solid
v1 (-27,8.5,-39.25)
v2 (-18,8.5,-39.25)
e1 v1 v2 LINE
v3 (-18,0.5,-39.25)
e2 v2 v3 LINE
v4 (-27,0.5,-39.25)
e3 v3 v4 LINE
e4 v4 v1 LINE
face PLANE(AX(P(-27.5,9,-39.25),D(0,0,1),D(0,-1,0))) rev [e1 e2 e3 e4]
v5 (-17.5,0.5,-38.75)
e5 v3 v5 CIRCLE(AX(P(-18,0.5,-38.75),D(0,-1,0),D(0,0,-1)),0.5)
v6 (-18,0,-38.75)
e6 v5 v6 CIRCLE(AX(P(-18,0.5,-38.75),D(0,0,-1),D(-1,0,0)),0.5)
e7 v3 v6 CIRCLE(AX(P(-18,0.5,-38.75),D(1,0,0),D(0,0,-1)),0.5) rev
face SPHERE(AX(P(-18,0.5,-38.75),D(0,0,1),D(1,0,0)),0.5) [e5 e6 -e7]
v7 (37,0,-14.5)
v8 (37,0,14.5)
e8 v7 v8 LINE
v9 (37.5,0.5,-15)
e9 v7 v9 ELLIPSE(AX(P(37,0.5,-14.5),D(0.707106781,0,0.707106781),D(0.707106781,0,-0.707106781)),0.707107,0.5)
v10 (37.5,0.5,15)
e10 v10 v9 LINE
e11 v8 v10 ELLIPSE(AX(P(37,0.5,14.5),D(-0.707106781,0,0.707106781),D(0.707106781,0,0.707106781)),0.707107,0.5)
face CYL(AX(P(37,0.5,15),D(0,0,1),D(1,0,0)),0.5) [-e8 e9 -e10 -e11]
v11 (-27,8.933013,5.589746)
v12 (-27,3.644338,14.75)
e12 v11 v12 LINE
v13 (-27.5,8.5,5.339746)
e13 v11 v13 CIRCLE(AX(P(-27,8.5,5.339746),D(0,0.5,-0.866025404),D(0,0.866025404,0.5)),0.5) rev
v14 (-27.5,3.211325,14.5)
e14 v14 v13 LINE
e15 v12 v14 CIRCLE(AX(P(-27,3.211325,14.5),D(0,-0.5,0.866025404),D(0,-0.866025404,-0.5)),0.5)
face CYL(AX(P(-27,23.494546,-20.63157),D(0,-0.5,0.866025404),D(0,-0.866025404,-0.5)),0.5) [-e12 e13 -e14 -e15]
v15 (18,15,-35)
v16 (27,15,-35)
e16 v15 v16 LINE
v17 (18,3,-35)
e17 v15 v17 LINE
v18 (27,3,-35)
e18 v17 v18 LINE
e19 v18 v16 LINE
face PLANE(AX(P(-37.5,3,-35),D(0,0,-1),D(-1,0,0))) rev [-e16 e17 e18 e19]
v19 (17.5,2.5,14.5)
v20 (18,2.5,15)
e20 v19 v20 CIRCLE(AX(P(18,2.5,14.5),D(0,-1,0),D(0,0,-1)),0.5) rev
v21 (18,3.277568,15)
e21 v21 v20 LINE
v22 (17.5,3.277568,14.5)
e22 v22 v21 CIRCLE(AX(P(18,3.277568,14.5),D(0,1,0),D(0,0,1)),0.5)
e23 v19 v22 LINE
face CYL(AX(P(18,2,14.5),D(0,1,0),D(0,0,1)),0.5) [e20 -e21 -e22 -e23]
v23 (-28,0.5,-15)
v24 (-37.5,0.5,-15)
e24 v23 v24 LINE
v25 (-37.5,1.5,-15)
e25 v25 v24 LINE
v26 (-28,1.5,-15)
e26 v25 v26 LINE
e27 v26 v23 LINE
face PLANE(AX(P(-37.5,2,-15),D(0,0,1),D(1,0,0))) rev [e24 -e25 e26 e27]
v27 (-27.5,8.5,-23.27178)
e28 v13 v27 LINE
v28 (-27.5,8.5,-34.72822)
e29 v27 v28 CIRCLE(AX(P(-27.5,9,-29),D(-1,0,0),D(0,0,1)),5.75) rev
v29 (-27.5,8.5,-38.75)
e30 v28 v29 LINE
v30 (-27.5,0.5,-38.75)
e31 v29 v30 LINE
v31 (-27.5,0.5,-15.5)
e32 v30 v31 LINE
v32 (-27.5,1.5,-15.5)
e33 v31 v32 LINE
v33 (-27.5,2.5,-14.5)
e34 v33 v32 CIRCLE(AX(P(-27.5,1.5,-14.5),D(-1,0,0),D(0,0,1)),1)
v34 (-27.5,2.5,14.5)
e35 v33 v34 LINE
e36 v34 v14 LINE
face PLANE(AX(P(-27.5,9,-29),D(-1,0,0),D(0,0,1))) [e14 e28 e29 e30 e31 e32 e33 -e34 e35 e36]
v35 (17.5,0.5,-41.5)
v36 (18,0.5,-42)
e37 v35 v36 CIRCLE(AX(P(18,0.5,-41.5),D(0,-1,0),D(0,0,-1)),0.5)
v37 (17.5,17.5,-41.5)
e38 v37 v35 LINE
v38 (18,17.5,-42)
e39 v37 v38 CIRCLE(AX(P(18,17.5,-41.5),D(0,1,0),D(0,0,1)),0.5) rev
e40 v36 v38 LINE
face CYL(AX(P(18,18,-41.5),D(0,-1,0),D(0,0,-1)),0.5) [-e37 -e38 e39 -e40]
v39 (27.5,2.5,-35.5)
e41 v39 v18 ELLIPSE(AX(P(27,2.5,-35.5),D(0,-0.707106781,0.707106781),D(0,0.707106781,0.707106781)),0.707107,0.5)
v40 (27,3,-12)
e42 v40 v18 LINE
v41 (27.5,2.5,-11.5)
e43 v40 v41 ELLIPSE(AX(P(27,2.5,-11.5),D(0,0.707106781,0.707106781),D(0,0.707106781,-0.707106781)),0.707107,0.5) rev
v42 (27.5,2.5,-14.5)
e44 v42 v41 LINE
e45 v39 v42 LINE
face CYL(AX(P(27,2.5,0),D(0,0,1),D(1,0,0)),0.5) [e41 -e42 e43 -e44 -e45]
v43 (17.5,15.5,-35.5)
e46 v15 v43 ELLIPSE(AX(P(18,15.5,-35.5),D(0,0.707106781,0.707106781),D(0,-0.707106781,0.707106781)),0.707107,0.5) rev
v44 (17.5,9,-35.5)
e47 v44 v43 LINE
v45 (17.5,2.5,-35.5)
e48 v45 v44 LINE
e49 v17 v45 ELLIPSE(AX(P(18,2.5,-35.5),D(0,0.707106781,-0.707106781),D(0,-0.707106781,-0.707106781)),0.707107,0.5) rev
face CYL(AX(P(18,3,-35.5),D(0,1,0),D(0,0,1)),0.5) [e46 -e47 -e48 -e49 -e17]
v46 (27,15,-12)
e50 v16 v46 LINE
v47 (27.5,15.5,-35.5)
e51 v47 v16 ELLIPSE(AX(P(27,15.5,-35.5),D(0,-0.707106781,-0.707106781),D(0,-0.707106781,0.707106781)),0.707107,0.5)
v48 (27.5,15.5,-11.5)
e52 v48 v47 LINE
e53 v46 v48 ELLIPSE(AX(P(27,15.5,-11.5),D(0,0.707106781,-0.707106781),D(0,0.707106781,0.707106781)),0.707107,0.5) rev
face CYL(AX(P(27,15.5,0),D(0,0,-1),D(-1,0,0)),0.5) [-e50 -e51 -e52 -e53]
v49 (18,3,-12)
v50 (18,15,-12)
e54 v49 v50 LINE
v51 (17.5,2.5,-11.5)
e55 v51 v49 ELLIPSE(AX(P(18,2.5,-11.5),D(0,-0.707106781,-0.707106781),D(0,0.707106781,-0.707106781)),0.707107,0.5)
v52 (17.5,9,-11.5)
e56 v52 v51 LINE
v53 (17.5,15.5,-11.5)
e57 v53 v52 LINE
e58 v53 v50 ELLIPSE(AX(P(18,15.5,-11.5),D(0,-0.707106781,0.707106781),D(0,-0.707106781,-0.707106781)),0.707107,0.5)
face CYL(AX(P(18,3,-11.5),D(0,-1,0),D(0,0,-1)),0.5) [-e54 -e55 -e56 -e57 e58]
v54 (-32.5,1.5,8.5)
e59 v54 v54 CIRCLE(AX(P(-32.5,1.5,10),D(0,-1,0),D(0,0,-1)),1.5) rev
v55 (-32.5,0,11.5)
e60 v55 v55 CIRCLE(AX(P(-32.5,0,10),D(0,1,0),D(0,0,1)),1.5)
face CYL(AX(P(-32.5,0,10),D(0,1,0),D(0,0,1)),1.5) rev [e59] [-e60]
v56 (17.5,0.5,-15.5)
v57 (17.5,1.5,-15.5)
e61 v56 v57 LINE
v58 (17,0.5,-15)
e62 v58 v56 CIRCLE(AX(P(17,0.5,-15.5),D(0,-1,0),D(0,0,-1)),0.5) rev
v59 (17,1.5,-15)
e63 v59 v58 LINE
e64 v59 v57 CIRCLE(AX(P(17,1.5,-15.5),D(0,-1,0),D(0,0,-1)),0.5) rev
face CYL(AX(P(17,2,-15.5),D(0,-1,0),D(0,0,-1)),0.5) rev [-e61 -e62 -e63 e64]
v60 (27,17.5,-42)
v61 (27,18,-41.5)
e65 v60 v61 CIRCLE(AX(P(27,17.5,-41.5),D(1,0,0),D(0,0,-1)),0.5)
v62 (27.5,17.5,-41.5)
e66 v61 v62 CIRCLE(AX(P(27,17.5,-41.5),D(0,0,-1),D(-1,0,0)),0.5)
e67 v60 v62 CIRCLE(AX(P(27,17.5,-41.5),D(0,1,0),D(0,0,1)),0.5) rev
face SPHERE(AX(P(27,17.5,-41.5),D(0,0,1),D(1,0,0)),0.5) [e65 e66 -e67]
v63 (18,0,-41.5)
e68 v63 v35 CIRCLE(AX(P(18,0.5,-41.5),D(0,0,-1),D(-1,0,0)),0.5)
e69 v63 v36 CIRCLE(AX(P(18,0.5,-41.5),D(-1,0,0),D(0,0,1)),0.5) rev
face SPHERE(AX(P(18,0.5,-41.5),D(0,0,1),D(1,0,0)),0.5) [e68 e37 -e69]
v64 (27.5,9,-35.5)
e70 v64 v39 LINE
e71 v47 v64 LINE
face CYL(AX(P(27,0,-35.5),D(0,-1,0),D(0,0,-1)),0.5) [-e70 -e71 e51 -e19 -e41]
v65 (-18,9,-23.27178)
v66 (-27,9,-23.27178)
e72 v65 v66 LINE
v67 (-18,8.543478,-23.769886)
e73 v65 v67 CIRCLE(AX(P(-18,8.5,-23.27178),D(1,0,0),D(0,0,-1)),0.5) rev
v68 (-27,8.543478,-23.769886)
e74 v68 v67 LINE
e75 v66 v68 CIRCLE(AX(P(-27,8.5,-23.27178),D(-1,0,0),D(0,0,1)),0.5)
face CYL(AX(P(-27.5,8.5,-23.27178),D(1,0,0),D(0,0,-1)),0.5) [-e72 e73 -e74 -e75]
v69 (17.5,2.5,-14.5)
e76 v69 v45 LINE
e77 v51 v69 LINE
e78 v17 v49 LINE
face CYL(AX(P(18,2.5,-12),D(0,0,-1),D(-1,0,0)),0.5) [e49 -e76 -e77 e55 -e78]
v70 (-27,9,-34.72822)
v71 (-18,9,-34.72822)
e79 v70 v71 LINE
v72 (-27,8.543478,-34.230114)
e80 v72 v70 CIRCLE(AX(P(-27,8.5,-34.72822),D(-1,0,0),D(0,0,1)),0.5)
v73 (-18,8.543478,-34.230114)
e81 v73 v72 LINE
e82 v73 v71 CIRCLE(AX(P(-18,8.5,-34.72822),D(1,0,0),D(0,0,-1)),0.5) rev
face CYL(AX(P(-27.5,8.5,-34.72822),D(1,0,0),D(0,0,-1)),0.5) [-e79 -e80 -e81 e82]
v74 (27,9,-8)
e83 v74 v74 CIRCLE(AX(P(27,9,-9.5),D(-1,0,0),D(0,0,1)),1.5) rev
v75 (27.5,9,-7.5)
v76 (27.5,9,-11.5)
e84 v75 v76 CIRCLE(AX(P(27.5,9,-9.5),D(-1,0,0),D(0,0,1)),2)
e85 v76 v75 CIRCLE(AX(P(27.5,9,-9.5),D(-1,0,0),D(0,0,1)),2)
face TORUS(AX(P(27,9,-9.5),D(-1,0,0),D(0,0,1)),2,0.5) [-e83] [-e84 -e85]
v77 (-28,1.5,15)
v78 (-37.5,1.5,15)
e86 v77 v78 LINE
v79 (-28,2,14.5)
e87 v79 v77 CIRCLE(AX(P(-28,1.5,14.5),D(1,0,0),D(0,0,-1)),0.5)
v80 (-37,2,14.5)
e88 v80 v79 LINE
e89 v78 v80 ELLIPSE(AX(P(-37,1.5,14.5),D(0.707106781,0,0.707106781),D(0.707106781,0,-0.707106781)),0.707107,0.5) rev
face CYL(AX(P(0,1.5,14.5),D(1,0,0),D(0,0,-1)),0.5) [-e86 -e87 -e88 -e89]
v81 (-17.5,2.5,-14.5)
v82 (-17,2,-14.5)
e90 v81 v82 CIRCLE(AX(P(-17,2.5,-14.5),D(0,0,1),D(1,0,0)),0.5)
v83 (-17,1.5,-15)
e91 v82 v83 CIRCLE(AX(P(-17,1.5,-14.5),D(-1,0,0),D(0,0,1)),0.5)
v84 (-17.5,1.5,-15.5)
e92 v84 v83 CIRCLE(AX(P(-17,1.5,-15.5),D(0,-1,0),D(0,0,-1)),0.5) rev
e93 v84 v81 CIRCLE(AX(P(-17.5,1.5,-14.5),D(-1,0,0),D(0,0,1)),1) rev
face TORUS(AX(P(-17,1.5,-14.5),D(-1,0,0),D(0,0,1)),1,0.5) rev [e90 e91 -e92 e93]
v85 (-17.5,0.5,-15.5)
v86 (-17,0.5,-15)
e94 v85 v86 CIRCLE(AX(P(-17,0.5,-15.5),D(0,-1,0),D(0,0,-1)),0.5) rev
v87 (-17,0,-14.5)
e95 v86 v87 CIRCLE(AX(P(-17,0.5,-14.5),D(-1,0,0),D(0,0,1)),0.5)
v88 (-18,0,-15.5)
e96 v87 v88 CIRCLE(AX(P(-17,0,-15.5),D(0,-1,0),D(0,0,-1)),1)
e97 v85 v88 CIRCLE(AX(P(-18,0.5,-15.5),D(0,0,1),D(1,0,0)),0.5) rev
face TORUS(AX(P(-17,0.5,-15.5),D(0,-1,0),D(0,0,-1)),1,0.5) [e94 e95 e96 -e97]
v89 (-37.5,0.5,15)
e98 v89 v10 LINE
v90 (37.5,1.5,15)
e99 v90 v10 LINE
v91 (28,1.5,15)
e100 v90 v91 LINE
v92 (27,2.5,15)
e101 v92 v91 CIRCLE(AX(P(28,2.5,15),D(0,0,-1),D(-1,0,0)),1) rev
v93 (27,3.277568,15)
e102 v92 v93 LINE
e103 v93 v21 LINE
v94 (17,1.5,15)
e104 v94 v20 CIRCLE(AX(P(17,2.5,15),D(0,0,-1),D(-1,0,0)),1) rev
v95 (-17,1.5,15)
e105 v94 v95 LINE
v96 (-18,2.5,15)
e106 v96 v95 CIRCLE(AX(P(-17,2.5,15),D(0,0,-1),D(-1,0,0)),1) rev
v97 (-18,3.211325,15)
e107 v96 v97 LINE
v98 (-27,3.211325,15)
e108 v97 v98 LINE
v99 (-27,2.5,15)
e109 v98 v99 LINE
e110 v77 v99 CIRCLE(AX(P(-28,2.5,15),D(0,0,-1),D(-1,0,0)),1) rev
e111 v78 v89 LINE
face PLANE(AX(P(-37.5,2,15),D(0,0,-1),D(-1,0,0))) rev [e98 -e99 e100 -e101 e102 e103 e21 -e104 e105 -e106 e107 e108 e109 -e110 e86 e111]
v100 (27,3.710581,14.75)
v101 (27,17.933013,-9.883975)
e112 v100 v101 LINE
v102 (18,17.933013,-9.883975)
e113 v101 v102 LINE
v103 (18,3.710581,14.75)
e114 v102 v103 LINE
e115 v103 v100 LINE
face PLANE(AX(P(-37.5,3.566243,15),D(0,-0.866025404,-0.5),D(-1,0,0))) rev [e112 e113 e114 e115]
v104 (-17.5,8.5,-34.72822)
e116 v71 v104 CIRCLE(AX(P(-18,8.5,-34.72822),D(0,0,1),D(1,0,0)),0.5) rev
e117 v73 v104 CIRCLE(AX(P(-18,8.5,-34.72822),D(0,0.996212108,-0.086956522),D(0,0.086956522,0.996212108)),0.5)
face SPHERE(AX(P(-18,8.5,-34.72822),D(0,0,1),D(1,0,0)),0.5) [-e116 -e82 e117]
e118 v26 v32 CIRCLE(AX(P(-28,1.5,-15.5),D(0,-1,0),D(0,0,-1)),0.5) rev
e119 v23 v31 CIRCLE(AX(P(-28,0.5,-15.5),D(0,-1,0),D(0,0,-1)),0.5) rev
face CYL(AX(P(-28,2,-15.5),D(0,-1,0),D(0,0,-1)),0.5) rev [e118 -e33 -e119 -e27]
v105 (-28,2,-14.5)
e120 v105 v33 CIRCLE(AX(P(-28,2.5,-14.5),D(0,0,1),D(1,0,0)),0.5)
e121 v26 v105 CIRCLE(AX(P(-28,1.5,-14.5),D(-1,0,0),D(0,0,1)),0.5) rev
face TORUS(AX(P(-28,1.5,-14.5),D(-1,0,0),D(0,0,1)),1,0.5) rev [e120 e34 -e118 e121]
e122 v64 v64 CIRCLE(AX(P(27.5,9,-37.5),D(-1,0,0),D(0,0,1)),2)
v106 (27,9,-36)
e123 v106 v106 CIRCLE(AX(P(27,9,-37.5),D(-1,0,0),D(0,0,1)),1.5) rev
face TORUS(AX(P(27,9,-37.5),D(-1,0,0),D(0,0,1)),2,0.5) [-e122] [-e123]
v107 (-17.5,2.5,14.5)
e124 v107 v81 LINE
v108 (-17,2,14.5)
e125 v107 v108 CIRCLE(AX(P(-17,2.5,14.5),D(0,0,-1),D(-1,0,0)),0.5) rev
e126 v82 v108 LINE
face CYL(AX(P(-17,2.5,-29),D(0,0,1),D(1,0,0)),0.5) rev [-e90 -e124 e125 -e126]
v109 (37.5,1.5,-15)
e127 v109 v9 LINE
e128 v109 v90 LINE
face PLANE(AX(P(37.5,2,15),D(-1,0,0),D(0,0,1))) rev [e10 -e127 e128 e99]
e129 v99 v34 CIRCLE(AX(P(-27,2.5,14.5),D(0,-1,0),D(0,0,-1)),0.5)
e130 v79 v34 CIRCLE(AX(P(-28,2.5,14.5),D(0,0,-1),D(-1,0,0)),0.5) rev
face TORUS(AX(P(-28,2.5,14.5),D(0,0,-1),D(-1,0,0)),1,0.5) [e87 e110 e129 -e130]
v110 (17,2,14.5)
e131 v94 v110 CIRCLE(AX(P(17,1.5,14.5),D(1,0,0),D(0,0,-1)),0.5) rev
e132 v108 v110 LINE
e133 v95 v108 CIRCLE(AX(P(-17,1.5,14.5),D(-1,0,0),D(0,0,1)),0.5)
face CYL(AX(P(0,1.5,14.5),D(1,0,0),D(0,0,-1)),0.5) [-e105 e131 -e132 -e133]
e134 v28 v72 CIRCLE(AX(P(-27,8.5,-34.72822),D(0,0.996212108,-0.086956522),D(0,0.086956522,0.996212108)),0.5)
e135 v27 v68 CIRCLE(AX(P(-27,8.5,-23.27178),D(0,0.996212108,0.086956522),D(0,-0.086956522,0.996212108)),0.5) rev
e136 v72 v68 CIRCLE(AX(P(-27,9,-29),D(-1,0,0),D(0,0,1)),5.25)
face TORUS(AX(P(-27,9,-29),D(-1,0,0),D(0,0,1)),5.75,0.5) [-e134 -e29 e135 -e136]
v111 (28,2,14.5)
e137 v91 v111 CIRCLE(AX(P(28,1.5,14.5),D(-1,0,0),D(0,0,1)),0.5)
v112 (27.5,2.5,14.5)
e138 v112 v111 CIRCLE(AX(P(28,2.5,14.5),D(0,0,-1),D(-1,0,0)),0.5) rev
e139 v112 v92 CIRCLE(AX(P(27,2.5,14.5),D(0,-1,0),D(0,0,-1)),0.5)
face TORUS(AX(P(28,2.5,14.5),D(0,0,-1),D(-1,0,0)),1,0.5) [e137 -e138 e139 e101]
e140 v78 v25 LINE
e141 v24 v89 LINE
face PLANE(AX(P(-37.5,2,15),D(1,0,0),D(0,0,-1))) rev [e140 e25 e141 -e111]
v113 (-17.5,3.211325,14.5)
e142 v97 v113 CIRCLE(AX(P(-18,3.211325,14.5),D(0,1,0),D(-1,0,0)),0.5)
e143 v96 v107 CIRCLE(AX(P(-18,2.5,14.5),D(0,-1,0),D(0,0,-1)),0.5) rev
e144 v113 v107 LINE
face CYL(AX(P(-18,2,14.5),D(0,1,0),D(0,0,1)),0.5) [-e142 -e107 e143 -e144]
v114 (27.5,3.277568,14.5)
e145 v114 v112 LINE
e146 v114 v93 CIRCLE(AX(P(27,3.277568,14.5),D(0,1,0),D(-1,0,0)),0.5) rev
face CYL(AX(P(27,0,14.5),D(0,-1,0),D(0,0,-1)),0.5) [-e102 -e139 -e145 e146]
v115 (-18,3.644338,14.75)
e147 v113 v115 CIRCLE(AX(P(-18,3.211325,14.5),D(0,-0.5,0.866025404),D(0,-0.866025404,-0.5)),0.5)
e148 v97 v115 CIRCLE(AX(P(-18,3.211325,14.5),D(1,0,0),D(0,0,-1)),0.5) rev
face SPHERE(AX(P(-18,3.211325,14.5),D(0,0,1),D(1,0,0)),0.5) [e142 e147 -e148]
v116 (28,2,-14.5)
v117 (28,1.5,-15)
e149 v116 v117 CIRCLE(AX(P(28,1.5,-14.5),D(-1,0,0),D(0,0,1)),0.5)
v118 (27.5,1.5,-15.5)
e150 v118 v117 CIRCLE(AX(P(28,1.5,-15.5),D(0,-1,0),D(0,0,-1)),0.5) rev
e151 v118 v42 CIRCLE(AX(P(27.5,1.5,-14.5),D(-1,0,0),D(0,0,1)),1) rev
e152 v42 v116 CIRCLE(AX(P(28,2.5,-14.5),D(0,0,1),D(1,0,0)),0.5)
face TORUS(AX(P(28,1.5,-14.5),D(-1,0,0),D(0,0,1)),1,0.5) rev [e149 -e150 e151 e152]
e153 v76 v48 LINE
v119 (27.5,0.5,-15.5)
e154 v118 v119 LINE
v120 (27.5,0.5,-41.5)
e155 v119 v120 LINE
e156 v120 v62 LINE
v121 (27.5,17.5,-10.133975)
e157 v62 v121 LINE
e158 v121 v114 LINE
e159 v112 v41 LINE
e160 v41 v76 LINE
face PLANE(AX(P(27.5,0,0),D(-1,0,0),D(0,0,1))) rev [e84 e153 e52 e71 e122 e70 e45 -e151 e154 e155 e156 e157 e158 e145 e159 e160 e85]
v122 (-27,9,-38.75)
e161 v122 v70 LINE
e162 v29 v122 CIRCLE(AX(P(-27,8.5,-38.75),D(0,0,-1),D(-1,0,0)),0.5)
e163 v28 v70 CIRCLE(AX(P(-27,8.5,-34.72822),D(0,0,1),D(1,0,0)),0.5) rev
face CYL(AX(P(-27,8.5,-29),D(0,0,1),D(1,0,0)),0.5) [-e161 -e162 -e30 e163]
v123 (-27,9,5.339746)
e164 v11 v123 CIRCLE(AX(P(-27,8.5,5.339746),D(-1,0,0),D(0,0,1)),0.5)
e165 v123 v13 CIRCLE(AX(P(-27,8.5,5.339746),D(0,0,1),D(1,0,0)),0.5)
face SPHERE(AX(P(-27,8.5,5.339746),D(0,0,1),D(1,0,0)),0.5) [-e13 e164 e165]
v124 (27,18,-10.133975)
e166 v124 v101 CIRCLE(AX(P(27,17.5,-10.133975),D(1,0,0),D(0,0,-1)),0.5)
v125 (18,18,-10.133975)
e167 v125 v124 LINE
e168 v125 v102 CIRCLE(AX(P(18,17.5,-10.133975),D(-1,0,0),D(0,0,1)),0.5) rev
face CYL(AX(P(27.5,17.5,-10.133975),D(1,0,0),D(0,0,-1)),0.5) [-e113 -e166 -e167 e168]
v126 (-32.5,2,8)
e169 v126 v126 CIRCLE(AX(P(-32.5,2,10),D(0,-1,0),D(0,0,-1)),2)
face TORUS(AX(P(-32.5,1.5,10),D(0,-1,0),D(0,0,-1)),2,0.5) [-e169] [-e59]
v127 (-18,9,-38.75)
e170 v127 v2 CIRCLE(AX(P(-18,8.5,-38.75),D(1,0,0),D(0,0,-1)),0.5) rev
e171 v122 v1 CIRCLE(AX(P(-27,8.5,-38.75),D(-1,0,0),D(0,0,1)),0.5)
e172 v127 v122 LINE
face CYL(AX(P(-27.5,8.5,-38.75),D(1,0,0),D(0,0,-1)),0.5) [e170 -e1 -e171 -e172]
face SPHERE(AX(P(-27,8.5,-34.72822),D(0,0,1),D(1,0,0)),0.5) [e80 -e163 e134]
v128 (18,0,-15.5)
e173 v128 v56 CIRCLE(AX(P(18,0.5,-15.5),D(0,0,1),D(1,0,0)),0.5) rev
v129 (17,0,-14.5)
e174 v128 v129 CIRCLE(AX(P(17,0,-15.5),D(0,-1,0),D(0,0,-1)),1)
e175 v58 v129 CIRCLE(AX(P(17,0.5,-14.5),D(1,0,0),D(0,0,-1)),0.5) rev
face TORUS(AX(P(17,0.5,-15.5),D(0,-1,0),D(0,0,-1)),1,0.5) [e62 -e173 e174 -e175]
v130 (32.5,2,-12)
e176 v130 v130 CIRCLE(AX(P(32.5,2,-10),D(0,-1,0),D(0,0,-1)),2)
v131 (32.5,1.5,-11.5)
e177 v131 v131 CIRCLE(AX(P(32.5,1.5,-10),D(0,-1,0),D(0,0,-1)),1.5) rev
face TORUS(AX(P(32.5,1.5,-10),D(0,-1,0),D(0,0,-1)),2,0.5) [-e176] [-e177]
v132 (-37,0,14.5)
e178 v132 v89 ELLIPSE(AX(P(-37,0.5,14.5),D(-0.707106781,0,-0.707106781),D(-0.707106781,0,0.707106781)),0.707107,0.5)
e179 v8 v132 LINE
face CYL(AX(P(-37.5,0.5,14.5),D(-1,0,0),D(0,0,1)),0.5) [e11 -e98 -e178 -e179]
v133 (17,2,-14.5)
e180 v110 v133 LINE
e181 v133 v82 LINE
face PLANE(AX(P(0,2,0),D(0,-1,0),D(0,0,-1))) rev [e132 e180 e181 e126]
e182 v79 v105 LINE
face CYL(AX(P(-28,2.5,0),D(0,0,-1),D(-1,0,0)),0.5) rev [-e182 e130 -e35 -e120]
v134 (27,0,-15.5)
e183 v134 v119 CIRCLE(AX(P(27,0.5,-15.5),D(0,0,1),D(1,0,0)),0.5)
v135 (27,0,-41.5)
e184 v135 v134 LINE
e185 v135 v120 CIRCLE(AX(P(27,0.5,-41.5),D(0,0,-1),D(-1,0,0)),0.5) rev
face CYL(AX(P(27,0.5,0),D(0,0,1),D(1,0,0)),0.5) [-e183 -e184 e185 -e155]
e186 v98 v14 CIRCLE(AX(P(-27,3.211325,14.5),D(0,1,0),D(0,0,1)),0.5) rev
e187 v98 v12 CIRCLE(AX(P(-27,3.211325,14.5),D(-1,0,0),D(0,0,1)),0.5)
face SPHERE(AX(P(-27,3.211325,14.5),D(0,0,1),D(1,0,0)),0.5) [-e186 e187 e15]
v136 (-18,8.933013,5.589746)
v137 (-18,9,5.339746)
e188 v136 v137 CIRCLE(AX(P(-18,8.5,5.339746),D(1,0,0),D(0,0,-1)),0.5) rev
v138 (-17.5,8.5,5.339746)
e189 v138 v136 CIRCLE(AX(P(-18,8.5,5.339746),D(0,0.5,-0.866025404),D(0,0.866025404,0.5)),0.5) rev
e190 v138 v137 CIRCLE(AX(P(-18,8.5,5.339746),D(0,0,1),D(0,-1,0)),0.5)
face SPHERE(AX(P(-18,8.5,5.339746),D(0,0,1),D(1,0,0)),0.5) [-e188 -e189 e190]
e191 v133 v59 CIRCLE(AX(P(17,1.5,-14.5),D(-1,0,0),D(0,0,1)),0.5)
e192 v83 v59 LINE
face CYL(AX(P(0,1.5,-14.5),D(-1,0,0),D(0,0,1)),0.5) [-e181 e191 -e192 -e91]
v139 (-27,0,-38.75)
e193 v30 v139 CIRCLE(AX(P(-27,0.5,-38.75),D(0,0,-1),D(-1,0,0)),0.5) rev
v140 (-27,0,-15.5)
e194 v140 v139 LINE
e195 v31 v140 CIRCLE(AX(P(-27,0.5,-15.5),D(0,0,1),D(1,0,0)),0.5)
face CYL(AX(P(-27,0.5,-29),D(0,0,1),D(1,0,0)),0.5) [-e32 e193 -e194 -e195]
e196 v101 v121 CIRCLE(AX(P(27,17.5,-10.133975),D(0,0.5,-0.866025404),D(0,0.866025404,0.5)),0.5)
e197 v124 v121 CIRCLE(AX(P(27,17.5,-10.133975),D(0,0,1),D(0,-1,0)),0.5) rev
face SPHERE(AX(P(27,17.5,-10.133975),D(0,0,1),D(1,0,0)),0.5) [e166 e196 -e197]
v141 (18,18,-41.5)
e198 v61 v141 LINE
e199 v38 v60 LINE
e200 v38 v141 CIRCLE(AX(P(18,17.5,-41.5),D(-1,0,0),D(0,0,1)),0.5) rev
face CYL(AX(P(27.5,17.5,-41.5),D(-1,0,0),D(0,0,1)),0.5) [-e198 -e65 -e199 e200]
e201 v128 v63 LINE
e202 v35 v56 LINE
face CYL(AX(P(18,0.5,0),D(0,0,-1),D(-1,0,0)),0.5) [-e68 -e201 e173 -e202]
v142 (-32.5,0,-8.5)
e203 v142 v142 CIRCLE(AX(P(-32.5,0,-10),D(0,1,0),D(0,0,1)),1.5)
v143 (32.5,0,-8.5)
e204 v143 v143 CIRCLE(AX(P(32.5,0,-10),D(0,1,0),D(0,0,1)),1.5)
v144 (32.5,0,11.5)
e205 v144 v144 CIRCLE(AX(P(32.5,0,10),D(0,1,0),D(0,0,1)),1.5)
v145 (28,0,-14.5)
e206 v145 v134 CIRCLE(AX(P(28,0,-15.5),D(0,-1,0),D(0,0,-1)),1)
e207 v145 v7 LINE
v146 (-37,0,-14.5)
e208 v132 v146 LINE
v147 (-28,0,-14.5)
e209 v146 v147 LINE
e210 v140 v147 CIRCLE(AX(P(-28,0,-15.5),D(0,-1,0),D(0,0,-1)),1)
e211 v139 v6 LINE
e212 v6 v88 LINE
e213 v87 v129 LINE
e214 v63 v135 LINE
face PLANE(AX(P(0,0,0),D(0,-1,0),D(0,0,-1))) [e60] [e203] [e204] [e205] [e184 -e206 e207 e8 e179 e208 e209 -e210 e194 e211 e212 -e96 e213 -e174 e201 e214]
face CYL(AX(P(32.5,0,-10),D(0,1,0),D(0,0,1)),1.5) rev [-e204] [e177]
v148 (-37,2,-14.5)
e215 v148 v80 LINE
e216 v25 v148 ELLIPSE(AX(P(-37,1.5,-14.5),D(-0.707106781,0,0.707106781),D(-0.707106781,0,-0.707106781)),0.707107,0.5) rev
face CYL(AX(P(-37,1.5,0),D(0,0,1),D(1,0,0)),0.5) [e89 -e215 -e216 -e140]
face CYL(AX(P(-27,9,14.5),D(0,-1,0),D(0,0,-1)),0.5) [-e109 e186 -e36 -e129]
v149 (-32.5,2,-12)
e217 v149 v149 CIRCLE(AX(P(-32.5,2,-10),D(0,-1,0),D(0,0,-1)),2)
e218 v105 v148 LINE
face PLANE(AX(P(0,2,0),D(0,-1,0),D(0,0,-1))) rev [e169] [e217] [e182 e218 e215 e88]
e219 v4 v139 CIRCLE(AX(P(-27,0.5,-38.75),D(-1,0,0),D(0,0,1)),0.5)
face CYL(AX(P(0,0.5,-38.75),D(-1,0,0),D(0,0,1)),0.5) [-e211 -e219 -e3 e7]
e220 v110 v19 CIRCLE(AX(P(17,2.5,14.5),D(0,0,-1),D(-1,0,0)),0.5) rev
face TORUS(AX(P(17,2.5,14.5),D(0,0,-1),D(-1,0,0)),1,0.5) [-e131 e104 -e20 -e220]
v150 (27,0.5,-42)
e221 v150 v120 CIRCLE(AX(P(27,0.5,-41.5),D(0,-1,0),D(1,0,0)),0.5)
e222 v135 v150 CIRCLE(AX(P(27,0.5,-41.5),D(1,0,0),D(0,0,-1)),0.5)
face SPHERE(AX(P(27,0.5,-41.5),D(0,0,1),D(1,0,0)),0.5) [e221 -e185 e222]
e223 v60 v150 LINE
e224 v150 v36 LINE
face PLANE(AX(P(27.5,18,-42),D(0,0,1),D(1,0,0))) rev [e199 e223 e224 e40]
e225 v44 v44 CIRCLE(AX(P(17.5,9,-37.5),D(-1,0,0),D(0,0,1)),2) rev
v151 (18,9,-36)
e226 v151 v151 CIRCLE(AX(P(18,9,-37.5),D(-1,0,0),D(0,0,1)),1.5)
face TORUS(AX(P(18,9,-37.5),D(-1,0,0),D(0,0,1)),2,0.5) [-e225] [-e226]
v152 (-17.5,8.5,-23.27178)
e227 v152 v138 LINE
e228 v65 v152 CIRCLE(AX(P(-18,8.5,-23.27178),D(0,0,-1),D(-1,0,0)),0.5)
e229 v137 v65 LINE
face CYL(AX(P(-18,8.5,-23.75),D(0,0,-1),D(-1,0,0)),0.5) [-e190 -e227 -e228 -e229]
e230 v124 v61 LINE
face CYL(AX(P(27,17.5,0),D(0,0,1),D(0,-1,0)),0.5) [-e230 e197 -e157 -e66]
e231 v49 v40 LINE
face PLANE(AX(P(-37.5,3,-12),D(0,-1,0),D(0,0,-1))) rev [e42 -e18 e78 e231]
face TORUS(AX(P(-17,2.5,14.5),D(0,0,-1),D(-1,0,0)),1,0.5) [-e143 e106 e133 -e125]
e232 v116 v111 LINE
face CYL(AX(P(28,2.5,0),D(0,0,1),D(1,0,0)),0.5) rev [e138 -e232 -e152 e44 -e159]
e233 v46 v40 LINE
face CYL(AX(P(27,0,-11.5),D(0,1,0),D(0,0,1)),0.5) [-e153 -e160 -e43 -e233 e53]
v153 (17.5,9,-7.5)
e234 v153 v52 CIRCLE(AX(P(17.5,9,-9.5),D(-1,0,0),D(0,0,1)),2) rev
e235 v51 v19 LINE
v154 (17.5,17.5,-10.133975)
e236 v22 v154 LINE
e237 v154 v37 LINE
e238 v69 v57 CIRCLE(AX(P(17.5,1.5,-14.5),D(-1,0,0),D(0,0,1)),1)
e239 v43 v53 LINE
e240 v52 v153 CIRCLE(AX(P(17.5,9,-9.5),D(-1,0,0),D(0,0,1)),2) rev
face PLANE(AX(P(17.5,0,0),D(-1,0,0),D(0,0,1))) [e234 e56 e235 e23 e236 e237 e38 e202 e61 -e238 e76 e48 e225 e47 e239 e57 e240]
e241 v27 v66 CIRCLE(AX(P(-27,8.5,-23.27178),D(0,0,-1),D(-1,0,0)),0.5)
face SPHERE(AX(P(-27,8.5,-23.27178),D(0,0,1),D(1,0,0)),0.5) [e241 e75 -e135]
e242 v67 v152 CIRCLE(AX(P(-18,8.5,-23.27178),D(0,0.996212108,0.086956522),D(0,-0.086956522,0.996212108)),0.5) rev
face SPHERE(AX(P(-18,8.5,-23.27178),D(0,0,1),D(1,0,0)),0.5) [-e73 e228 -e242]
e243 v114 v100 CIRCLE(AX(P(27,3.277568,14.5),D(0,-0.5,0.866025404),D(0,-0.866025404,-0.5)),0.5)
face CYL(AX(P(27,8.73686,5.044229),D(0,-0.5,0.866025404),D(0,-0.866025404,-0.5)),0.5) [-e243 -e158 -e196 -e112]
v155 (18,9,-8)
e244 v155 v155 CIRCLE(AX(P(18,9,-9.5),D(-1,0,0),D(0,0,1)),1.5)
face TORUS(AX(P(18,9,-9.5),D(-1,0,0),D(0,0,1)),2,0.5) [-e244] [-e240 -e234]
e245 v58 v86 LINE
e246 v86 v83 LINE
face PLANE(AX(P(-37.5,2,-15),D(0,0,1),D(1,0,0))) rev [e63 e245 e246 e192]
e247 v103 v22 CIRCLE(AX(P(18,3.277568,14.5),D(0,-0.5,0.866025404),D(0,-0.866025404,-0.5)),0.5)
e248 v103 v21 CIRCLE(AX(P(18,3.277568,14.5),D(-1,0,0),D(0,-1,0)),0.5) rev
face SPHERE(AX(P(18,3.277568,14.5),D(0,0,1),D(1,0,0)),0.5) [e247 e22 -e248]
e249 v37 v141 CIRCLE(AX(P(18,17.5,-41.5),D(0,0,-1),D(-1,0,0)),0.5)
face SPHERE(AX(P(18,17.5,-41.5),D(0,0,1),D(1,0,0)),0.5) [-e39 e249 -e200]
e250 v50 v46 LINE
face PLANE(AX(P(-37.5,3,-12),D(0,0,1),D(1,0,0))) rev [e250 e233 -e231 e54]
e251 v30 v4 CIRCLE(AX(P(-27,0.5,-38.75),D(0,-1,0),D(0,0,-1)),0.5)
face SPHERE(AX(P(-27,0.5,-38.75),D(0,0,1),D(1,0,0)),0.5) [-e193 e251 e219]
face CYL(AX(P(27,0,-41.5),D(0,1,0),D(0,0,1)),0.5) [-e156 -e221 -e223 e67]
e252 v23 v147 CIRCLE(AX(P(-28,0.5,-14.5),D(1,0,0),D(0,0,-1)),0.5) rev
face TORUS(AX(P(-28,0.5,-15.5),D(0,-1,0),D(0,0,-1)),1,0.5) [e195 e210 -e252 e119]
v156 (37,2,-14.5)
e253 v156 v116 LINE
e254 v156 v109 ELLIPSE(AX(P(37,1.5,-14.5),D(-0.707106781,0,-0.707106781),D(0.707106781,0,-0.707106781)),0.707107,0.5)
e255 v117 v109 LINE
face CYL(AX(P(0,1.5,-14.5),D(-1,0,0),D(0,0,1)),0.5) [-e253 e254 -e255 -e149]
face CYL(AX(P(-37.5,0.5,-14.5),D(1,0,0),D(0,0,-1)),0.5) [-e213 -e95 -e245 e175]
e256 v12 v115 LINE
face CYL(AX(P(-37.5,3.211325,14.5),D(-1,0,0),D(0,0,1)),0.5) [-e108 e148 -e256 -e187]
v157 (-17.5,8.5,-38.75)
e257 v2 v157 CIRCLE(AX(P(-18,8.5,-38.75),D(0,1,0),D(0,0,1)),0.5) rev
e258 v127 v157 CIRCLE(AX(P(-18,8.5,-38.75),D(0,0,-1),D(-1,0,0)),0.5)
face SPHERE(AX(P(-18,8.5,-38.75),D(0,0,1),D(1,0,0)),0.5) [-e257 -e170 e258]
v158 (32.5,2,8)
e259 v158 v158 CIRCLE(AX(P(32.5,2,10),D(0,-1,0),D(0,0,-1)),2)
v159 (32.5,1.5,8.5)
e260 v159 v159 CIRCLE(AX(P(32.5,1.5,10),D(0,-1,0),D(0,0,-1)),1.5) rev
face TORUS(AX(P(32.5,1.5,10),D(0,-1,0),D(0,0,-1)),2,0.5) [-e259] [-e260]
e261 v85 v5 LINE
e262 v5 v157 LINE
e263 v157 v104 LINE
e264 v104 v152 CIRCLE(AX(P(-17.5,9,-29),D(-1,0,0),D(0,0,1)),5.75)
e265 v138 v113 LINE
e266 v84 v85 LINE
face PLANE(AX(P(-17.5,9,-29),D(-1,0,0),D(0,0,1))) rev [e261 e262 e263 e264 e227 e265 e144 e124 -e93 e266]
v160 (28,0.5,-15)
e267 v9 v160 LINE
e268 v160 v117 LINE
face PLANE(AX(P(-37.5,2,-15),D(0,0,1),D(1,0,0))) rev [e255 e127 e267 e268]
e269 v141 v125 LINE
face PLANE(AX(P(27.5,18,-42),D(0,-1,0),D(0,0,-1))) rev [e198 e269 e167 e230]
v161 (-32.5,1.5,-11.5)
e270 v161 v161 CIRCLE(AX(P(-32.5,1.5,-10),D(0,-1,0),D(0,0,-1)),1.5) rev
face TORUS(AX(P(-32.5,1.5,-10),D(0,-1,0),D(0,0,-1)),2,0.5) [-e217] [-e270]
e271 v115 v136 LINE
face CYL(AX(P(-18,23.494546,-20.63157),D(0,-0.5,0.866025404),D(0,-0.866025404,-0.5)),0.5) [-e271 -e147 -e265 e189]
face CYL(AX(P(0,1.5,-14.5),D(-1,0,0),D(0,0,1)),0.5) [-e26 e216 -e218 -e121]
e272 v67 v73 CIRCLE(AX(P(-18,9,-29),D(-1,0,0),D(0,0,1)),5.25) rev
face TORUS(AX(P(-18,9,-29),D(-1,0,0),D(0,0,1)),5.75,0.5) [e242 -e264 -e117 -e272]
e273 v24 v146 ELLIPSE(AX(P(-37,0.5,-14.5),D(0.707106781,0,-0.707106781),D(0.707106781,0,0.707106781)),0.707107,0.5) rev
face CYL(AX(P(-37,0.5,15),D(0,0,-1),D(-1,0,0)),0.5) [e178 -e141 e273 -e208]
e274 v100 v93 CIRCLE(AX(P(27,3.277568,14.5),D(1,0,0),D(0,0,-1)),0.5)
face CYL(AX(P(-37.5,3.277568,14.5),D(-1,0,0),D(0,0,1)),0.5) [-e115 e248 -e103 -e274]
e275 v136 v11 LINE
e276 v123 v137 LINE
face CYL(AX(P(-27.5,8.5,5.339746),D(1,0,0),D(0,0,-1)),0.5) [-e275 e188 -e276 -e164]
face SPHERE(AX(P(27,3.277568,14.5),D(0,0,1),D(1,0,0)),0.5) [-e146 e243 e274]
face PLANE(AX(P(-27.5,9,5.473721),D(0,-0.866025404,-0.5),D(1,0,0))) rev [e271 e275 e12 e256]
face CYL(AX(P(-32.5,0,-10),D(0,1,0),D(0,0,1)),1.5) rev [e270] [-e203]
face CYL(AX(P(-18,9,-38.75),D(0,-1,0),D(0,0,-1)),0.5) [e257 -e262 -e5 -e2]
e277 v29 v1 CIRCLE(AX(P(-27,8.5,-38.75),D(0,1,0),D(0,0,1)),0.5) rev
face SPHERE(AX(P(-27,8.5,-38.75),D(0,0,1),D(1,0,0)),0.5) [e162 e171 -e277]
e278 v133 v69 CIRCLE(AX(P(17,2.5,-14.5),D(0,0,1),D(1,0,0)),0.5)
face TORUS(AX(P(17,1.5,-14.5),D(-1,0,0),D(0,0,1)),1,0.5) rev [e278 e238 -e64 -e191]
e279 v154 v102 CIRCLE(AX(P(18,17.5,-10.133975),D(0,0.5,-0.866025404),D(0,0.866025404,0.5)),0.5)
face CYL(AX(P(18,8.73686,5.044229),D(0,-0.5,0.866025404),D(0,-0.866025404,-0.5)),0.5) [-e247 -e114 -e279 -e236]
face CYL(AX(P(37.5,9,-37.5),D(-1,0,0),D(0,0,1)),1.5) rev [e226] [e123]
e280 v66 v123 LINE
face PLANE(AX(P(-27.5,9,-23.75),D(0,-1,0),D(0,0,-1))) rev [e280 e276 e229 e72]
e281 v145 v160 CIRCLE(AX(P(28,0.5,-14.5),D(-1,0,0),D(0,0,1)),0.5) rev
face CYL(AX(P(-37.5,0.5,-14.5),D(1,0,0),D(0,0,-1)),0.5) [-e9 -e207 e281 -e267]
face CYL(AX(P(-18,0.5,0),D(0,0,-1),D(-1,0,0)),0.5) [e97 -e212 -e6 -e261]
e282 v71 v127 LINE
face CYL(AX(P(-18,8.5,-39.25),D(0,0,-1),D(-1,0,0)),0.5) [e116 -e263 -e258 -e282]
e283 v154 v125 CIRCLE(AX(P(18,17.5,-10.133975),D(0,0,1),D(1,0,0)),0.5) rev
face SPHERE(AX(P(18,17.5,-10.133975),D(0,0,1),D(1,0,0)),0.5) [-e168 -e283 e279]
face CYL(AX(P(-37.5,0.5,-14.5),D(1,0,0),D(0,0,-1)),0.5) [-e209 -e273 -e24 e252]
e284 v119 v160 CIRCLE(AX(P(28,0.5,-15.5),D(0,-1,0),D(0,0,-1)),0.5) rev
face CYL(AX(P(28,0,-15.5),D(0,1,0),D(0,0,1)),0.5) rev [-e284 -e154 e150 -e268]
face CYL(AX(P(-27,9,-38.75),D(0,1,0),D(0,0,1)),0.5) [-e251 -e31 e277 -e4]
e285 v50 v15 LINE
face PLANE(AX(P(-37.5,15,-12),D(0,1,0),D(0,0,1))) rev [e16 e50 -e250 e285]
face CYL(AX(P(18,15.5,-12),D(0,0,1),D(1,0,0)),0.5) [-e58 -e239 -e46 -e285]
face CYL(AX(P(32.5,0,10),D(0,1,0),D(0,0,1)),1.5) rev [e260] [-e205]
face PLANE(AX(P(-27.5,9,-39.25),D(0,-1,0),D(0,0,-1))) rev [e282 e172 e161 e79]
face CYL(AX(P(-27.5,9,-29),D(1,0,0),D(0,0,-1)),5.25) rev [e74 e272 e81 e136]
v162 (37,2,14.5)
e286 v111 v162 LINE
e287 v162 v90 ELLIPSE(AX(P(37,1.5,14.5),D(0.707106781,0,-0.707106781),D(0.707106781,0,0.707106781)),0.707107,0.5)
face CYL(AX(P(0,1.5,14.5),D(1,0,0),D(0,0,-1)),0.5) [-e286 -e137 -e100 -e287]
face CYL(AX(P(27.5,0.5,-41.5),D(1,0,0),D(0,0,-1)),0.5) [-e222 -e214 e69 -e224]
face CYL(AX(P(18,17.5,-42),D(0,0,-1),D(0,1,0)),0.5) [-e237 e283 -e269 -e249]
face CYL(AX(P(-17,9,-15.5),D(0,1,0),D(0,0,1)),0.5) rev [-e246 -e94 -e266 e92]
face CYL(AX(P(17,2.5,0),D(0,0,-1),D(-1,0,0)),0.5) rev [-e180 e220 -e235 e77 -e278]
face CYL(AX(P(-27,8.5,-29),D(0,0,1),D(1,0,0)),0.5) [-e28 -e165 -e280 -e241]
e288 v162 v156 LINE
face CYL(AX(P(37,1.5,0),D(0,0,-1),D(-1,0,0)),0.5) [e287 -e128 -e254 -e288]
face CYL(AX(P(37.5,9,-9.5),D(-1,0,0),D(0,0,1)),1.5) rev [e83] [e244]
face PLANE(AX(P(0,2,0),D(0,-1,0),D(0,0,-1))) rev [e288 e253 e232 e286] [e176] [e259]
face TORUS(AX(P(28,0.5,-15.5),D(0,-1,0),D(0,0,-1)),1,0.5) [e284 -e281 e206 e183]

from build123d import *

# Parameters (mm, degrees)
SKETCH4_W               = 75
SKETCH4_H               = 30
BOSS_EXTRUDE3_DEPTH     = 2
SKETCH5_W               = 57
SKETCH5_H               = 18
BOSS_EXTRUDE4_DEPTH     = 5
CUT_EXTRUDE2_DEPTH      = 80.454389432
CUT_EXTRUDE2_DEPTH_BACK = 80.454389432
SKETCH6_W               = 23
SKETCH6_H               = 12
BOSS_EXTRUDE5_DEPTH     = 10
SKETCH8_R               = 1.5
CUT_EXTRUDE3_DEPTH      = 59.53417805
SKETCH9_R               = 1.5
CUT_EXTRUDE4_DEPTH      = 72.505244563
CHAMFER1_SIZE           = 25
CHAMFER1_SIZE2          = 14.43375673
CHAMFER2_SIZE           = 5.5
CHAMFER2_SIZE2          = 9.526279442
FILLET1_R               = 0.5


with BuildPart() as part:
    # Sketch4 → Boss-Extrude3 (new body)
    with BuildSketch(Plane(origin=(0, 0, 0), x_dir=(1, 0, 0), z_dir=(0, 1, 0))):
        Rectangle(SKETCH4_W, SKETCH4_H)
    extrude(amount=BOSS_EXTRUDE3_DEPTH)

    # Sketch5 → Boss-Extrude4 (add, symmetric)
    with BuildSketch(Plane(origin=(22.5, 0, 0), x_dir=(0, 0, -1), z_dir=(1, 0, 0))):
        with Locations((13.5, 9)):
            Rectangle(SKETCH5_W, SKETCH5_H)
    extrude(amount=BOSS_EXTRUDE4_DEPTH, both=True)

    # Sketch6 → Cut-Extrude2 (cut, two sides: drawn at the far end of the back side and taken through both)
    with BuildSketch(Plane(origin=(27.5, 0, 0), x_dir=(0, 0, -1), z_dir=(1, 0, 0)).offset(-CUT_EXTRUDE2_DEPTH_BACK)):
        with Locations((23.5, 9)):
            Rectangle(SKETCH6_W, SKETCH6_H)
    extrude(amount=CUT_EXTRUDE2_DEPTH + CUT_EXTRUDE2_DEPTH_BACK, mode=Mode.SUBTRACT)

    # Sketch7 → Boss-Extrude5 (add)
    with BuildSketch(Plane.ZY.offset(17.5)):
        with BuildLine():
            Line((-23.75, 9), (15, 9))
            Line((15, 9), (15, 0))
            Line((15, 0), (-39.25, 0))
            Line((-39.25, 0), (-39.25, 9))
            Line((-39.25, 9), (-34.25, 9))
            ThreePointArc((-34.25, 9), (-29, 3.75), (-23.75, 9))
        make_face()
    extrude(amount=BOSS_EXTRUDE5_DEPTH)

    # Sketch8 → Cut-Extrude3 (cut, through all)
    with BuildSketch(Plane(origin=(0, 2, 0), x_dir=(1, 0, 0), z_dir=(0, 1, 0))):
        with Locations(Location((-32.5, 10, 0), (0, 0, 270))):
            Circle(SKETCH8_R)
        with Locations(Location((-32.5, -10, 0), (0, 0, 270))):
            Circle(SKETCH8_R)
        with Locations(Location((32.5, 10, 0), (0, 0, 270))):
            Circle(SKETCH8_R)
        with Locations(Location((32.5, -10, 0), (0, 0, 270))):
            Circle(SKETCH8_R)
    extrude(amount=-CUT_EXTRUDE3_DEPTH, mode=Mode.SUBTRACT)

    # Sketch9 → Cut-Extrude4 (cut, through all)
    with BuildSketch(Plane.ZY.offset(-17.5)):
        with Locations((-9.5, 9)):
            Circle(SKETCH9_R)
        with Locations((-37.5, 9)):
            Circle(SKETCH9_R)
    extrude(amount=-CUT_EXTRUDE4_DEPTH, mode=Mode.SUBTRACT)

    # Chamfer1
    chamfer1_edges = [part.edges().sort_by_distance(p)[0] for p in [
        (22.5, 18, 15),
    ]]
    chamfer1_side = [part.faces().sort_by_distance(p)[0] for p in [
        (22.5, 18, -13.5),
    ]]
    chamfer(chamfer1_edges, length=CHAMFER1_SIZE, length2=CHAMFER1_SIZE2, reference=chamfer1_side[0])

    # Chamfer2
    chamfer2_edges = [part.edges().sort_by_distance(p)[0] for p in [
        (-22.5, 9, 15),
    ]]
    chamfer2_side = [part.faces().sort_by_distance(p)[0] for p in [
        (18.255380699, 2.783121635, 15),
    ]]
    chamfer(chamfer2_edges, length=CHAMFER2_SIZE, length2=CHAMFER2_SIZE2, reference=chamfer2_side[0])

    # Fillet1
    fillet1_edges = [part.edges().sort_by_distance(p)[0] for p in [
        (-32.5, 2, -11.5),
        (27.5, 9, -11),
        (17.5, 9, -11),
        (27.5, 9, -39),
        (17.5, 9, -39),
        (27.5, 2.783121635, 15),
        (17.5, 2.783121635, 15),
        (22.5, 3.56624327, 15),
        (17.5, 10.783121635, 2.5),
        (22.5, 18, -10),
        (27.5, 10.783121635, 2.5),
        (-17.5, 9, -9.138139721),
        (-27.5, 9, -9.138139721),
        (-22.5, 9, 5.473720558),
        (-17.5, 6.25, 10.236860279),
        (-22.5, 3.5, 15),
        (-27.5, 6.25, 10.236860279),
        (-37.5, 2, 0),
        (0, 0, -15),
        (0, 2, -15),
        (32.5, 2, 15),
        (-32.5, 2, 15),
        (17.5, 0, -28.5),
        (27.5, 2, 0),
        (27.5, 1, -15),
        (27.5, 0, -28.5),
        (27.5, 9, -42),
        (27.5, 18, -26),
        (17.5, 9, -42),
        (22.5, 0, -42),
        (17.5, 18, -26),
        (22.5, 18, -42),
        (17.5, 2, 0),
        (17.5, 1, -15),
        (17.5, 15, -23.5),
        (17.5, 9, -12),
        (17.5, 3, -23.5),
        (17.5, 9, -35),
        (27.5, 9, -35),
        (27.5, 3, -23.5),
        (27.5, 9, -12),
        (27.5, 15, -23.5),
        (37.5, 2, 0),
        (0, 0, 15),
        (-37.5, 0, 0),
        (32.5, 0, -15),
        (37.5, 0, 0),
        (-32.5, 0, -15),
        (0, 2, 15),
        (-32.5, 2, -15),
        (-17.5, 0, -27.125),
        (-22.5, 0, -39.25),
        (-17.5, 2.75, 15),
        (-27.5, 2.75, 15),
        (-27.5, 3.75, -29),
        (-27.5, 9, -36.75),
        (-27.5, 4.5, -39.25),
        (-27.5, 0, -27.125),
        (-17.5, 2, 0),
        (-17.5, 1, -15),
        (-17.5, 3.75, -29),
        (-22.5, 9, -23.75),
        (-17.5, 9, -36.75),
        (-22.5, 9, -34.25),
        (-17.5, 4.5, -39.25),
        (-22.5, 9, -39.25),
        (-27.5, 2, 0),
        (-27.5, 1, -15),
        (32.5, 2, -15),
        (-32.5, 2, 8.5),
        (32.5, 2, -11.5),
        (32.5, 2, 8.5),
    ]]
    fillet(fillet1_edges, radius=FILLET1_R - 0.0001)  # a hair under: the kernel refuses the full size


solid = part.part
